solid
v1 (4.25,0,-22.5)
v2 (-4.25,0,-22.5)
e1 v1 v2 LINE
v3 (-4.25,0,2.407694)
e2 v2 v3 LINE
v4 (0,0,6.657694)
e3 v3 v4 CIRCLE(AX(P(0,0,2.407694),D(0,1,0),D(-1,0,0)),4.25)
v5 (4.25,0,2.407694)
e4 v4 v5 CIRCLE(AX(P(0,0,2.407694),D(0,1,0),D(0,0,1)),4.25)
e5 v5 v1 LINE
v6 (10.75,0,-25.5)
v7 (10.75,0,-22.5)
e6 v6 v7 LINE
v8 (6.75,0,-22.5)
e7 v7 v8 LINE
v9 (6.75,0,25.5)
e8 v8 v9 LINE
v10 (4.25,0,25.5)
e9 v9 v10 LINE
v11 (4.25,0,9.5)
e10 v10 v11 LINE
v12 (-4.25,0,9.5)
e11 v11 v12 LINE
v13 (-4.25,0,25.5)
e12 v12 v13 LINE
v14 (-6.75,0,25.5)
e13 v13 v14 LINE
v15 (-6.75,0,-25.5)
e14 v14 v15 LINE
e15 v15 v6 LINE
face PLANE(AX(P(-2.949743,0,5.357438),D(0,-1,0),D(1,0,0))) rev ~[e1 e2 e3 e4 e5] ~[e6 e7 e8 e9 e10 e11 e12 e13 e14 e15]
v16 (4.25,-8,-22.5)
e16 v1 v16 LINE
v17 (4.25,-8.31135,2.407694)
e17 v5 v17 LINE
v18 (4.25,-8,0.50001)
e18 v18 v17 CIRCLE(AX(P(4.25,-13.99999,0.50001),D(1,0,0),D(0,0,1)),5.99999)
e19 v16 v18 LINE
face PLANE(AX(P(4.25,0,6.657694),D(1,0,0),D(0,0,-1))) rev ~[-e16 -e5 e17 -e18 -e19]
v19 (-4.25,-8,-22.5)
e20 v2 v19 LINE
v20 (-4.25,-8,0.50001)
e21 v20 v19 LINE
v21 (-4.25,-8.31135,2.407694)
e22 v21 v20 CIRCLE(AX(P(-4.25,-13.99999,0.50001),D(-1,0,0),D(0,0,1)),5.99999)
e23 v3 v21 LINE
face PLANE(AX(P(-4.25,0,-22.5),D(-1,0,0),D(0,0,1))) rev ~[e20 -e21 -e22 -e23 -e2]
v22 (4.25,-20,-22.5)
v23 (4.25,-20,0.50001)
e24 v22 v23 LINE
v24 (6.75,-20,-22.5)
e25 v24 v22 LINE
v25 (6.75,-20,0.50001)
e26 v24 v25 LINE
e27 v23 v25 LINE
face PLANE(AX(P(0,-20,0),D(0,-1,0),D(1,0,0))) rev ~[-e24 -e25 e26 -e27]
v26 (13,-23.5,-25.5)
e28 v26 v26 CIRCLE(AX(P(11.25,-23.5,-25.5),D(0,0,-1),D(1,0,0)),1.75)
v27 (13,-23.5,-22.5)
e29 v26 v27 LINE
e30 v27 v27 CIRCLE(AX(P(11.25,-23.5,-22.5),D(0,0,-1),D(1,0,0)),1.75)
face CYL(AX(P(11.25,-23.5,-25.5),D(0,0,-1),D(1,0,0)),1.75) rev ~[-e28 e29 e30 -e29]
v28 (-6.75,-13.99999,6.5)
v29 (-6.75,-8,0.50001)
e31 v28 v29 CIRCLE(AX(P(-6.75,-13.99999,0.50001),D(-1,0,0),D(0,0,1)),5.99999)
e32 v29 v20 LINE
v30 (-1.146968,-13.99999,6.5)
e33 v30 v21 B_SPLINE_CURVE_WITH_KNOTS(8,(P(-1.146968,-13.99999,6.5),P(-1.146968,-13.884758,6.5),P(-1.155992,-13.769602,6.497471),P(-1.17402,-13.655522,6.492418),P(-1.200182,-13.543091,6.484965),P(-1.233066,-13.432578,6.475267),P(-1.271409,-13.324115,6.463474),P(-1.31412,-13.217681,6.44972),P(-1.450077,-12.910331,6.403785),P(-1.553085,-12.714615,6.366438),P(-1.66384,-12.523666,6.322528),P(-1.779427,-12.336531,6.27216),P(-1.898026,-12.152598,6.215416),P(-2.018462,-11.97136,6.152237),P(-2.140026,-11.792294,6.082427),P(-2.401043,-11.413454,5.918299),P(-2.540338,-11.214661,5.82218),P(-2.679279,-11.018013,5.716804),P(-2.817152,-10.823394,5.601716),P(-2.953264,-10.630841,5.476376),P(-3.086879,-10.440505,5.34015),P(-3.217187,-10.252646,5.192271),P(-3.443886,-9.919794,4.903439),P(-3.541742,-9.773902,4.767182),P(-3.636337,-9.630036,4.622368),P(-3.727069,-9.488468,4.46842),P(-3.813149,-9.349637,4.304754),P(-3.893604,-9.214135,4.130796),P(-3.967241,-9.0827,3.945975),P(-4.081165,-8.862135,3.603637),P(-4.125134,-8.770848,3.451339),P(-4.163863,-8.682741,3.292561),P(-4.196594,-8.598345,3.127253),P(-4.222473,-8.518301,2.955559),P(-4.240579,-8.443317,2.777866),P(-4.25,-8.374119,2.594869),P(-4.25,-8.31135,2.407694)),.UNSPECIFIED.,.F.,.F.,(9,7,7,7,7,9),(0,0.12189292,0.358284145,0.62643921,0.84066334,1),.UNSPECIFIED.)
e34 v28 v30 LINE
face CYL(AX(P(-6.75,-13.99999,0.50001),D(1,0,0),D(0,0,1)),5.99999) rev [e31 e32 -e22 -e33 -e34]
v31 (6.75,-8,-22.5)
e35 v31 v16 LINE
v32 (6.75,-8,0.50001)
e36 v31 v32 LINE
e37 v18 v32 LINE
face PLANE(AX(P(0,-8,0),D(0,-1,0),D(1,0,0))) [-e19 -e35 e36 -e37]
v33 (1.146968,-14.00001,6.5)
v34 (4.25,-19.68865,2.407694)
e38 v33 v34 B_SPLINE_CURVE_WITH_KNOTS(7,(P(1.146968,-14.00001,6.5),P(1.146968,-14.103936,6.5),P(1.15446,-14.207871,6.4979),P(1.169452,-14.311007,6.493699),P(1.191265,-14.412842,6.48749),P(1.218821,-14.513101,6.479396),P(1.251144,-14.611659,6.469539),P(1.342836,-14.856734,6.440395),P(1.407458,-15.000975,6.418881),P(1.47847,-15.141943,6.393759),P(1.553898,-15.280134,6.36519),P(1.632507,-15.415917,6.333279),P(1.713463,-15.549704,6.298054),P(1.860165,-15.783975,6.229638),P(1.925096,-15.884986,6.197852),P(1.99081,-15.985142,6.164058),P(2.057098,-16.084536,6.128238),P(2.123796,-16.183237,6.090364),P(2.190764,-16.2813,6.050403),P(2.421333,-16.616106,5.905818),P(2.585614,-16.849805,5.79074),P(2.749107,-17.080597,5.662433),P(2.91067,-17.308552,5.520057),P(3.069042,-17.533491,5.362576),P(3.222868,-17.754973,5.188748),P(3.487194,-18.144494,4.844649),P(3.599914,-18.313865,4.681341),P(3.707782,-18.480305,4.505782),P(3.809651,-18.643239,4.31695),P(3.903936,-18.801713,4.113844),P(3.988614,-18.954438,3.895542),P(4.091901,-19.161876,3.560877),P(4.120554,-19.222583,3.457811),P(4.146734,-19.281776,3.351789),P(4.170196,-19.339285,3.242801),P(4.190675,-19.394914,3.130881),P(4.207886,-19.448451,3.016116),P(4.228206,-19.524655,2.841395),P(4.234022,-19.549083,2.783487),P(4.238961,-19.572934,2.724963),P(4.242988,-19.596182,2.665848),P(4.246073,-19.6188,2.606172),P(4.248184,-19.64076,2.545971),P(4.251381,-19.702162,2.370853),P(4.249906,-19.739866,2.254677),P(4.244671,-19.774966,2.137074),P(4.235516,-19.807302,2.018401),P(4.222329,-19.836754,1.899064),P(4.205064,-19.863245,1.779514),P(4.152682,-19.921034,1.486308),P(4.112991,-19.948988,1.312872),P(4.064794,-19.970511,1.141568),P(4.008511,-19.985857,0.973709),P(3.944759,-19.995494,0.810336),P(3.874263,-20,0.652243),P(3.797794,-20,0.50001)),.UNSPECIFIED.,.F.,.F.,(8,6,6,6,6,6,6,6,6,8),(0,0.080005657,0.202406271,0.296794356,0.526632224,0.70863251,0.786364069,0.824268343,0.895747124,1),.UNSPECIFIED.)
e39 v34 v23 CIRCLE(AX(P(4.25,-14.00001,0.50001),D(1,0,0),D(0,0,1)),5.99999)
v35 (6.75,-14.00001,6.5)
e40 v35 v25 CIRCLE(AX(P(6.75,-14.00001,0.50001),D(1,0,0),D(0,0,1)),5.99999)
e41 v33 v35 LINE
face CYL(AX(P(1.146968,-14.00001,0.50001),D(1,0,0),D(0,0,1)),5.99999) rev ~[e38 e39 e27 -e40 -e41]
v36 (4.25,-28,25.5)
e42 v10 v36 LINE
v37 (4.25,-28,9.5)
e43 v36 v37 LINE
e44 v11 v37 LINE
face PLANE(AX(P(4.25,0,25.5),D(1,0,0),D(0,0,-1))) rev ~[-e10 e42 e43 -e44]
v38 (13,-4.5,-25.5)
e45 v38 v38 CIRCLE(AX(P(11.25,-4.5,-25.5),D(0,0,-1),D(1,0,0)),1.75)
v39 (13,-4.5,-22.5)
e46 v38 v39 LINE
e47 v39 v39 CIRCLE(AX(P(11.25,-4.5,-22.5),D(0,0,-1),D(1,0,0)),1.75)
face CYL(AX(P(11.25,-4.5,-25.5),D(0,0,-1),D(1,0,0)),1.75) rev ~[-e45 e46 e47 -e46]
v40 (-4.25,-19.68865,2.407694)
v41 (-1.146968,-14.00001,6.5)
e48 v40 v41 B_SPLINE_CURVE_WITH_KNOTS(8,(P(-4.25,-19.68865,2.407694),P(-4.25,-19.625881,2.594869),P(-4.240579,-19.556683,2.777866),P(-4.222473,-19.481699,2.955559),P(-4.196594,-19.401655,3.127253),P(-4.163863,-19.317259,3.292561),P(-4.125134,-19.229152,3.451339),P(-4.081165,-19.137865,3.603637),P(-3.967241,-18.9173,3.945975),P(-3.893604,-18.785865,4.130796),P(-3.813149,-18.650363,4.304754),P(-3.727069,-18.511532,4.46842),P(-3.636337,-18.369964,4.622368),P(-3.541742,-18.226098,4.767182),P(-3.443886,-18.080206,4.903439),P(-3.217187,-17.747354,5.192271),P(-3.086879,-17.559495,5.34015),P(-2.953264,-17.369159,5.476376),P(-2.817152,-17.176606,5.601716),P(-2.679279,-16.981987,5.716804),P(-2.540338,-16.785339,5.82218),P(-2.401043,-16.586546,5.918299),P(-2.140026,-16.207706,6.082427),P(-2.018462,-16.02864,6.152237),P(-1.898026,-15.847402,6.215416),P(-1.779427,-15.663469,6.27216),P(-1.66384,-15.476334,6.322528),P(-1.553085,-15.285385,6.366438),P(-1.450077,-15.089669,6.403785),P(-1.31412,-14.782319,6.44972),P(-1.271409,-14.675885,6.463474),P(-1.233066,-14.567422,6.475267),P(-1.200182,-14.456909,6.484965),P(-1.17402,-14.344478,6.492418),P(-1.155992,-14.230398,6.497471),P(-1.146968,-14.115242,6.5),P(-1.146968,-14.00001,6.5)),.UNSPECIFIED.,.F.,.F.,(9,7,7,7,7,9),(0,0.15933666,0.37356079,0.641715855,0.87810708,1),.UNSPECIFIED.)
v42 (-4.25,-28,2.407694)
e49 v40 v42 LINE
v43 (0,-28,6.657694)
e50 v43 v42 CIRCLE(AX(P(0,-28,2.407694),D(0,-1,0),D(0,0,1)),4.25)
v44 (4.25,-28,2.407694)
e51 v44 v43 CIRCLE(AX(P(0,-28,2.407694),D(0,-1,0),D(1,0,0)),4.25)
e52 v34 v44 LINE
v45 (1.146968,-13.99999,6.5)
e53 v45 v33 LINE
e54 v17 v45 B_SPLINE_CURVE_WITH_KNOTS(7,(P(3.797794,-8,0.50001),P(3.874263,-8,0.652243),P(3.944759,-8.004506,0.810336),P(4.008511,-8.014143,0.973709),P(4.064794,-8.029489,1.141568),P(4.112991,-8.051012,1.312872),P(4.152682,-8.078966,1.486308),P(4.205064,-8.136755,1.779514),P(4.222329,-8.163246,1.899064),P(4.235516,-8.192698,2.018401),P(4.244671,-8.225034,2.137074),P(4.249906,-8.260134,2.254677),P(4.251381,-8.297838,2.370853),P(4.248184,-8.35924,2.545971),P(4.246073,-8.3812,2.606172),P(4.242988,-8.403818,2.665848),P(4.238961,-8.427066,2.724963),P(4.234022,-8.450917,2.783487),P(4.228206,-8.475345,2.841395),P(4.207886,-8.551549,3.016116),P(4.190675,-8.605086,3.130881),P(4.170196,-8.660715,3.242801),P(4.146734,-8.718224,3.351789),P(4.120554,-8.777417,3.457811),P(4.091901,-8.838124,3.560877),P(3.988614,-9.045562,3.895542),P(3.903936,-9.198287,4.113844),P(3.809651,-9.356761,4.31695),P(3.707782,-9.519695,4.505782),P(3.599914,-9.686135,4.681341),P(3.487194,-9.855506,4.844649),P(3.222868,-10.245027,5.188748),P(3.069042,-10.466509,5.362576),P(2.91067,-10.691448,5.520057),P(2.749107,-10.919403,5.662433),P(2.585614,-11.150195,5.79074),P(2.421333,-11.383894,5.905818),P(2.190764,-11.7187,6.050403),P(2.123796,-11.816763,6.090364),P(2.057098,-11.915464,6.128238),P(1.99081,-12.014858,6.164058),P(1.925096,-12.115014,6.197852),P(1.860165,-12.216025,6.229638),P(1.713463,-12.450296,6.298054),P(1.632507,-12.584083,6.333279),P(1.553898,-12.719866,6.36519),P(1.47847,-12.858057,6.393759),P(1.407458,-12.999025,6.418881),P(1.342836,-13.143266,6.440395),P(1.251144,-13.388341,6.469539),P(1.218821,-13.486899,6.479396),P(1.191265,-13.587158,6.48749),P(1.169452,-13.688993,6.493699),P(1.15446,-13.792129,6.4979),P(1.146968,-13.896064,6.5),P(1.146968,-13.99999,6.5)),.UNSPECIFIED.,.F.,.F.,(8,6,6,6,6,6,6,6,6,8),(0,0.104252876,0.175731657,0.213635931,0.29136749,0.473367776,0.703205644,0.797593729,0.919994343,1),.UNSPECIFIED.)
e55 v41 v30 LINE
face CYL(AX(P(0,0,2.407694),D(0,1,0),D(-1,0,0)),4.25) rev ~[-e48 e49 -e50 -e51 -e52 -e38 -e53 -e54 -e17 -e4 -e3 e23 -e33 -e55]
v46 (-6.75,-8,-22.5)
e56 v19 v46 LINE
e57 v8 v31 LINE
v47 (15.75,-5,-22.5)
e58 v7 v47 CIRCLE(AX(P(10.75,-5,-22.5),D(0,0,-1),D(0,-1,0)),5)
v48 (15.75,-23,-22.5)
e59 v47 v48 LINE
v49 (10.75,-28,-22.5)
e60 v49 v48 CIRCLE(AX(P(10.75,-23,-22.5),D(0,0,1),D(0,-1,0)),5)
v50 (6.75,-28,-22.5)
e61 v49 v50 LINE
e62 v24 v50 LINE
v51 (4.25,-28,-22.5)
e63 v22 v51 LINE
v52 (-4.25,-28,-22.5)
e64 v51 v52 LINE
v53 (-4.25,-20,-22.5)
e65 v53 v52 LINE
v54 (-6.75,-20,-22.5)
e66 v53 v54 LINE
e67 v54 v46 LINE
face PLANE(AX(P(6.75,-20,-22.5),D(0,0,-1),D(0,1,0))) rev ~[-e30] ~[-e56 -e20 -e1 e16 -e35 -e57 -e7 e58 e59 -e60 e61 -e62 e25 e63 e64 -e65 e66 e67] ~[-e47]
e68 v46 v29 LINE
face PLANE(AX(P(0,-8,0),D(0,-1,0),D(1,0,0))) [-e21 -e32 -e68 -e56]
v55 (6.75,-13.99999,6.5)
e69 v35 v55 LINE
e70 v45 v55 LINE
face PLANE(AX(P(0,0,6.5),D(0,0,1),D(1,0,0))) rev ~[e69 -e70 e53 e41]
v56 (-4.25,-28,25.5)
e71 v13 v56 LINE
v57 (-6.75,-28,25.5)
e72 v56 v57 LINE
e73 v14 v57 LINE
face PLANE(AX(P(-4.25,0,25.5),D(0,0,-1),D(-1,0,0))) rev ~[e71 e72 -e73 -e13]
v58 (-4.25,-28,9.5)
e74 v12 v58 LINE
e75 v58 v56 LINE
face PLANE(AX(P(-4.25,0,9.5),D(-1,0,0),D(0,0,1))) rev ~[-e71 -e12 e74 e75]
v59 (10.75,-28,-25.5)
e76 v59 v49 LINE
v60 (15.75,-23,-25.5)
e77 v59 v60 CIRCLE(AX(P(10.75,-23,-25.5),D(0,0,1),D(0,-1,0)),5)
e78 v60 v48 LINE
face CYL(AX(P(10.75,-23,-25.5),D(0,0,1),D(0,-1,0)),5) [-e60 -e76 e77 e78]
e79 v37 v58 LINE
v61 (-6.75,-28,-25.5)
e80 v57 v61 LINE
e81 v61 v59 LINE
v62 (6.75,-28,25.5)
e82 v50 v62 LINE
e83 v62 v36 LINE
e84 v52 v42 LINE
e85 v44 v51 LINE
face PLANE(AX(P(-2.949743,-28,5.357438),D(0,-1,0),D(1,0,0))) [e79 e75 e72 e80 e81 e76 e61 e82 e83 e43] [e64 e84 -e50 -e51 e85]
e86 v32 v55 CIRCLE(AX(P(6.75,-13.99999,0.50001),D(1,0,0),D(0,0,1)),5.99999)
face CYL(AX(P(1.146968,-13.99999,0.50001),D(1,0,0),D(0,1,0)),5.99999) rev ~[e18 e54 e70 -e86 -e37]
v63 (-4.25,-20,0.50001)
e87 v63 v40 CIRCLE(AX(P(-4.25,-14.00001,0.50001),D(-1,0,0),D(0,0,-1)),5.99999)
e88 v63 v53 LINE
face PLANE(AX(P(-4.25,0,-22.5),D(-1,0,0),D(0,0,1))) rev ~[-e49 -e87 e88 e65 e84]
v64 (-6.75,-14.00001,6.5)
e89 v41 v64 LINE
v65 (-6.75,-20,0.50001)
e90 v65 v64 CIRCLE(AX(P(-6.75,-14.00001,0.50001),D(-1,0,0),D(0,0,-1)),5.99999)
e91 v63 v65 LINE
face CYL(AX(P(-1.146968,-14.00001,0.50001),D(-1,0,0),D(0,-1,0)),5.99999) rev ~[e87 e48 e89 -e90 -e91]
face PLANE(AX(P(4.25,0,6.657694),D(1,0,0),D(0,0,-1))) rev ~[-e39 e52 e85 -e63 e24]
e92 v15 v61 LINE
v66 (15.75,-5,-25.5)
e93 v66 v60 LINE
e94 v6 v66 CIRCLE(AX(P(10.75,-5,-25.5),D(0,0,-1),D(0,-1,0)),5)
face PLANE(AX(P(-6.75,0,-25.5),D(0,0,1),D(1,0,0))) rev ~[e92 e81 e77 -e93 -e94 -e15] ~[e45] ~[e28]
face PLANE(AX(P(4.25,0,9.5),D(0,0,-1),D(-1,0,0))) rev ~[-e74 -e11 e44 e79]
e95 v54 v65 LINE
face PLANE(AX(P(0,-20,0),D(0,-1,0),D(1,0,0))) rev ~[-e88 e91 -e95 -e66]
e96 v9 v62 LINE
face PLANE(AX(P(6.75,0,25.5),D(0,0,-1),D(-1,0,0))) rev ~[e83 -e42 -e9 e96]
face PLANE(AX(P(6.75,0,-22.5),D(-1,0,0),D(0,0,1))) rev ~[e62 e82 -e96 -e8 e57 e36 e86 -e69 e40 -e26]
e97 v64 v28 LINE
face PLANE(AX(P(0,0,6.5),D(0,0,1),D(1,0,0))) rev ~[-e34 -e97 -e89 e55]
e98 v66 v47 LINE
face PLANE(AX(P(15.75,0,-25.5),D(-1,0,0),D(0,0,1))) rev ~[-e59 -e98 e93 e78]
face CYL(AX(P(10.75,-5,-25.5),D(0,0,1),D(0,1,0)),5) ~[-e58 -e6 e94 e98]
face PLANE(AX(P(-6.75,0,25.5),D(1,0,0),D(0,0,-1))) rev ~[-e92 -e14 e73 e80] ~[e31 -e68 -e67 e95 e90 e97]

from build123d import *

# Parameters (mm, degrees)
F1_DEPTH     = 28
F2_R         = 1.75
F3_DEPTH     = 25
F4_W         = 12
F4_H         = 29
F5_DEPTH     = 25
F6_T4_DEPTH  = 28
F6_T10_DEPTH = 28
F6_T16_DEPTH = 28
F6_T23_DEPTH = 28
F6_T29_DEPTH = 28
F6_T35_DEPTH = 28
F6_T41_DEPTH = 28
F6_T47_DEPTH = 28
F6_T54_DEPTH = 28
F6_T60_DEPTH = 28
F7_R         = 5.99999
F8_R         = 5


# Not quite as in the source:
# - a fillet or chamfer that OpenCascade refuses, or shapes differently, is made with other operations: its cross-section is extruded or revolved along the edge and cut away or added
# - a fillet or chamfer is up to 0.001 mm smaller than in the source, because OpenCascade refuses the exact size


with BuildPart() as f1:
    # F0 (on Front) → F1 (new body)
    with BuildSketch(Plane.XZ):
        Polygon((-4.25, 25.5), (-6.75, 25.5), (-6.75, -22.5), (-6.75, -25.5), (-4.25, -25.5), (4.25, -25.5), (6.75, -25.5), (15.75, -25.5), (15.75, -22.5), (6.75, -22.5), (6.75, 25.5), (4.25, 25.5), (4.25, 9.5), (0, 9.5), (-4.25, 9.5), align=None)
        Polygon((4.25, -22.5), (-4.25, -22.5), (-4.25, 6.6576944664), (0, 6.6576944664), (4.25, 6.6576944664), align=None, mode=Mode.SUBTRACT)
    extrude(amount=F1_DEPTH)

    # F2 (on face) → F3 (cut)
    with BuildSketch(Plane(origin=(0, 0, -25.5), x_dir=(1, 0, 0), z_dir=(0, 0, -1))):
        with Locations((11.25, 23.5)):
            Circle(F2_R)
        with Locations((11.25, 4.5)):
            Circle(F2_R)
    extrude(amount=-F3_DEPTH, mode=Mode.SUBTRACT)

    # F4 (on face) → F5 (cut)
    with BuildSketch(Plane.YZ.offset(6.75)):
        with Locations((-14, -8)):
            Rectangle(F4_W, F4_H)
    extrude(amount=-F5_DEPTH, mode=Mode.SUBTRACT)

    # F6: fillet of radius 4.25 on 2 edges, made by hand


with BuildPart() as f6_tool2:
    # F6_s3 → F6_t4 (new body)
    with BuildSketch(Plane.XZ):
        with BuildLine():
            ThreePointArc((0, 6.6576944664), (3.00520382, 5.4128982865), (4.25, 2.4076944664))
            Line((4.25, 2.4076944664), (4.25, 6.6576944664))
            Line((4.25, 6.6576944664), (0, 6.6576944664))
        make_face()
    extrude(amount=F6_T4_DEPTH)

    split(bisect_by=Plane.XZ.offset(8), keep=Keep.BOTTOM)

    split(bisect_by=Plane.XY.offset(6.5), keep=Keep.TOP)


with BuildPart() as f1_1:
    add(f1.part)

    # F6_t1: union F6_tool2
    add(f6_tool2.part)


with BuildPart() as f6_tool8:
    # F6_s9 → F6_t10 (new body)
    with BuildSketch(Plane.XZ):
        with BuildLine():
            ThreePointArc((0, 6.6576944664), (3.00520382, 5.4128982865), (4.25, 2.4076944664))
            Line((4.25, 2.4076944664), (4.25, 6.6576944664))
            Line((4.25, 6.6576944664), (0, 6.6576944664))
        make_face()
    extrude(amount=F6_T10_DEPTH)

    split(bisect_by=Plane.XZ.offset(8), keep=Keep.BOTTOM)

    split(bisect_by=Plane.XY.offset(6.5), keep=Keep.BOTTOM)


with BuildPart() as f1_2:
    add(f1_1.part)

    # F6_t7: union F6_tool8
    add(f6_tool8.part)


with BuildPart() as f6_tool14:
    # F6_s15 → F6_t16 (new body)
    with BuildSketch(Plane.XZ):
        with BuildLine():
            ThreePointArc((0, 6.6576944664), (3.00520382, 5.4128982865), (4.25, 2.4076944664))
            Line((4.25, 2.4076944664), (4.25, 6.6576944664))
            Line((4.25, 6.6576944664), (0, 6.6576944664))
        make_face()
    extrude(amount=F6_T16_DEPTH)

    split(bisect_by=Plane.XZ.offset(8), keep=Keep.TOP)

    split(bisect_by=Plane.XY.offset(6.5), keep=Keep.TOP)

    split(bisect_by=Plane.XZ.offset(20), keep=Keep.BOTTOM)


with BuildPart() as f1_3:
    add(f1_2.part)

    # F6_t13: union F6_tool14
    add(f6_tool14.part)


with BuildPart() as f6_tool21:
    # F6_s22 → F6_t23 (new body)
    with BuildSketch(Plane.XZ):
        with BuildLine():
            ThreePointArc((0, 6.6576944664), (3.00520382, 5.4128982865), (4.25, 2.4076944664))
            Line((4.25, 2.4076944664), (4.25, 6.6576944664))
            Line((4.25, 6.6576944664), (0, 6.6576944664))
        make_face()
    extrude(amount=F6_T23_DEPTH)

    split(bisect_by=Plane.XY.offset(6.5), keep=Keep.TOP)

    split(bisect_by=Plane.XZ.offset(20), keep=Keep.TOP)


with BuildPart() as f1_4:
    add(f1_3.part)

    # F6_t20: union F6_tool21
    add(f6_tool21.part)


with BuildPart() as f6_tool27:
    # F6_s28 → F6_t29 (new body)
    with BuildSketch(Plane.XZ):
        with BuildLine():
            ThreePointArc((0, 6.6576944664), (3.00520382, 5.4128982865), (4.25, 2.4076944664))
            Line((4.25, 2.4076944664), (4.25, 6.6576944664))
            Line((4.25, 6.6576944664), (0, 6.6576944664))
        make_face()
    extrude(amount=F6_T29_DEPTH)

    split(bisect_by=Plane.XY.offset(6.5), keep=Keep.BOTTOM)

    split(bisect_by=Plane.XZ.offset(20), keep=Keep.TOP)


with BuildPart() as f1_5:
    add(f1_4.part)

    # F6_t26: union F6_tool27
    add(f6_tool27.part)


with BuildPart() as f6_tool33:
    # F6_s34 → F6_t35 (new body)
    with BuildSketch(Plane.XZ):
        with BuildLine():
            ThreePointArc((-4.25, 2.4076944664), (-3.00520382, 5.4128982865), (0, 6.6576944664))
            Line((0, 6.6576944664), (-4.25, 6.6576944664))
            Line((-4.25, 6.6576944664), (-4.25, 2.4076944664))
        make_face()
    extrude(amount=F6_T35_DEPTH)

    split(bisect_by=Plane.XZ.offset(8), keep=Keep.BOTTOM)

    split(bisect_by=Plane.XY.offset(6.5), keep=Keep.BOTTOM)


with BuildPart() as f1_6:
    add(f1_5.part)

    # F6_t32: union F6_tool33
    add(f6_tool33.part)


with BuildPart() as f6_tool39:
    # F6_s40 → F6_t41 (new body)
    with BuildSketch(Plane.XZ):
        with BuildLine():
            ThreePointArc((-4.25, 2.4076944664), (-3.00520382, 5.4128982865), (0, 6.6576944664))
            Line((0, 6.6576944664), (-4.25, 6.6576944664))
            Line((-4.25, 6.6576944664), (-4.25, 2.4076944664))
        make_face()
    extrude(amount=F6_T41_DEPTH)

    split(bisect_by=Plane.XZ.offset(8), keep=Keep.BOTTOM)

    split(bisect_by=Plane.XY.offset(6.5), keep=Keep.TOP)


with BuildPart() as f1_7:
    add(f1_6.part)

    # F6_t38: union F6_tool39
    add(f6_tool39.part)


with BuildPart() as f6_tool45:
    # F6_s46 → F6_t47 (new body)
    with BuildSketch(Plane.XZ):
        with BuildLine():
            ThreePointArc((-4.25, 2.4076944664), (-3.00520382, 5.4128982865), (0, 6.6576944664))
            Line((0, 6.6576944664), (-4.25, 6.6576944664))
            Line((-4.25, 6.6576944664), (-4.25, 2.4076944664))
        make_face()
    extrude(amount=F6_T47_DEPTH)

    split(bisect_by=Plane.XZ.offset(20), keep=Keep.BOTTOM)

    split(bisect_by=Plane.XZ.offset(8), keep=Keep.TOP)

    split(bisect_by=Plane.XY.offset(6.5), keep=Keep.TOP)


with BuildPart() as f1_8:
    add(f1_7.part)

    # F6_t44: union F6_tool45
    add(f6_tool45.part)


with BuildPart() as f6_tool52:
    # F6_s53 → F6_t54 (new body)
    with BuildSketch(Plane.XZ):
        with BuildLine():
            ThreePointArc((-4.25, 2.4076944664), (-3.00520382, 5.4128982865), (0, 6.6576944664))
            Line((0, 6.6576944664), (-4.25, 6.6576944664))
            Line((-4.25, 6.6576944664), (-4.25, 2.4076944664))
        make_face()
    extrude(amount=F6_T54_DEPTH)

    split(bisect_by=Plane.XZ.offset(20), keep=Keep.TOP)

    split(bisect_by=Plane.XY.offset(6.5), keep=Keep.BOTTOM)


with BuildPart() as f1_9:
    add(f1_8.part)

    # F6_t51: union F6_tool52
    add(f6_tool52.part)


with BuildPart() as f6_tool58:
    # F6_s59 → F6_t60 (new body)
    with BuildSketch(Plane.XZ):
        with BuildLine():
            ThreePointArc((-4.25, 2.4076944664), (-3.00520382, 5.4128982865), (0, 6.6576944664))
            Line((0, 6.6576944664), (-4.25, 6.6576944664))
            Line((-4.25, 6.6576944664), (-4.25, 2.4076944664))
        make_face()
    extrude(amount=F6_T60_DEPTH)

    split(bisect_by=Plane.XZ.offset(20), keep=Keep.TOP)

    split(bisect_by=Plane.XY.offset(6.5), keep=Keep.TOP)


with BuildPart() as f1_10:
    add(f1_9.part)

    # F6_t57: union F6_tool58
    add(f6_tool58.part)

    # F7 (radius 6 in the source; OpenCascade refuses exactly that, so slightly less here)
    f7_edges = [f1_10.edges().sort_by_distance(p)[0] for p in [
        (3.948484, -20, 6.5),
        (-3.948484, -20, 6.5),
        (-3.948484, -8, 6.5),
        (3.948484, -8, 6.5),
    ]]
    fillet(f7_edges, radius=F7_R)

    # F8
    f8_edges = [f1_10.edges().sort_by_distance(p)[0] for p in [
        (15.75, 0, -24),
        (15.75, -28, -24),
    ]]
    fillet(f8_edges, radius=F8_R)


solid = f1_10.part
